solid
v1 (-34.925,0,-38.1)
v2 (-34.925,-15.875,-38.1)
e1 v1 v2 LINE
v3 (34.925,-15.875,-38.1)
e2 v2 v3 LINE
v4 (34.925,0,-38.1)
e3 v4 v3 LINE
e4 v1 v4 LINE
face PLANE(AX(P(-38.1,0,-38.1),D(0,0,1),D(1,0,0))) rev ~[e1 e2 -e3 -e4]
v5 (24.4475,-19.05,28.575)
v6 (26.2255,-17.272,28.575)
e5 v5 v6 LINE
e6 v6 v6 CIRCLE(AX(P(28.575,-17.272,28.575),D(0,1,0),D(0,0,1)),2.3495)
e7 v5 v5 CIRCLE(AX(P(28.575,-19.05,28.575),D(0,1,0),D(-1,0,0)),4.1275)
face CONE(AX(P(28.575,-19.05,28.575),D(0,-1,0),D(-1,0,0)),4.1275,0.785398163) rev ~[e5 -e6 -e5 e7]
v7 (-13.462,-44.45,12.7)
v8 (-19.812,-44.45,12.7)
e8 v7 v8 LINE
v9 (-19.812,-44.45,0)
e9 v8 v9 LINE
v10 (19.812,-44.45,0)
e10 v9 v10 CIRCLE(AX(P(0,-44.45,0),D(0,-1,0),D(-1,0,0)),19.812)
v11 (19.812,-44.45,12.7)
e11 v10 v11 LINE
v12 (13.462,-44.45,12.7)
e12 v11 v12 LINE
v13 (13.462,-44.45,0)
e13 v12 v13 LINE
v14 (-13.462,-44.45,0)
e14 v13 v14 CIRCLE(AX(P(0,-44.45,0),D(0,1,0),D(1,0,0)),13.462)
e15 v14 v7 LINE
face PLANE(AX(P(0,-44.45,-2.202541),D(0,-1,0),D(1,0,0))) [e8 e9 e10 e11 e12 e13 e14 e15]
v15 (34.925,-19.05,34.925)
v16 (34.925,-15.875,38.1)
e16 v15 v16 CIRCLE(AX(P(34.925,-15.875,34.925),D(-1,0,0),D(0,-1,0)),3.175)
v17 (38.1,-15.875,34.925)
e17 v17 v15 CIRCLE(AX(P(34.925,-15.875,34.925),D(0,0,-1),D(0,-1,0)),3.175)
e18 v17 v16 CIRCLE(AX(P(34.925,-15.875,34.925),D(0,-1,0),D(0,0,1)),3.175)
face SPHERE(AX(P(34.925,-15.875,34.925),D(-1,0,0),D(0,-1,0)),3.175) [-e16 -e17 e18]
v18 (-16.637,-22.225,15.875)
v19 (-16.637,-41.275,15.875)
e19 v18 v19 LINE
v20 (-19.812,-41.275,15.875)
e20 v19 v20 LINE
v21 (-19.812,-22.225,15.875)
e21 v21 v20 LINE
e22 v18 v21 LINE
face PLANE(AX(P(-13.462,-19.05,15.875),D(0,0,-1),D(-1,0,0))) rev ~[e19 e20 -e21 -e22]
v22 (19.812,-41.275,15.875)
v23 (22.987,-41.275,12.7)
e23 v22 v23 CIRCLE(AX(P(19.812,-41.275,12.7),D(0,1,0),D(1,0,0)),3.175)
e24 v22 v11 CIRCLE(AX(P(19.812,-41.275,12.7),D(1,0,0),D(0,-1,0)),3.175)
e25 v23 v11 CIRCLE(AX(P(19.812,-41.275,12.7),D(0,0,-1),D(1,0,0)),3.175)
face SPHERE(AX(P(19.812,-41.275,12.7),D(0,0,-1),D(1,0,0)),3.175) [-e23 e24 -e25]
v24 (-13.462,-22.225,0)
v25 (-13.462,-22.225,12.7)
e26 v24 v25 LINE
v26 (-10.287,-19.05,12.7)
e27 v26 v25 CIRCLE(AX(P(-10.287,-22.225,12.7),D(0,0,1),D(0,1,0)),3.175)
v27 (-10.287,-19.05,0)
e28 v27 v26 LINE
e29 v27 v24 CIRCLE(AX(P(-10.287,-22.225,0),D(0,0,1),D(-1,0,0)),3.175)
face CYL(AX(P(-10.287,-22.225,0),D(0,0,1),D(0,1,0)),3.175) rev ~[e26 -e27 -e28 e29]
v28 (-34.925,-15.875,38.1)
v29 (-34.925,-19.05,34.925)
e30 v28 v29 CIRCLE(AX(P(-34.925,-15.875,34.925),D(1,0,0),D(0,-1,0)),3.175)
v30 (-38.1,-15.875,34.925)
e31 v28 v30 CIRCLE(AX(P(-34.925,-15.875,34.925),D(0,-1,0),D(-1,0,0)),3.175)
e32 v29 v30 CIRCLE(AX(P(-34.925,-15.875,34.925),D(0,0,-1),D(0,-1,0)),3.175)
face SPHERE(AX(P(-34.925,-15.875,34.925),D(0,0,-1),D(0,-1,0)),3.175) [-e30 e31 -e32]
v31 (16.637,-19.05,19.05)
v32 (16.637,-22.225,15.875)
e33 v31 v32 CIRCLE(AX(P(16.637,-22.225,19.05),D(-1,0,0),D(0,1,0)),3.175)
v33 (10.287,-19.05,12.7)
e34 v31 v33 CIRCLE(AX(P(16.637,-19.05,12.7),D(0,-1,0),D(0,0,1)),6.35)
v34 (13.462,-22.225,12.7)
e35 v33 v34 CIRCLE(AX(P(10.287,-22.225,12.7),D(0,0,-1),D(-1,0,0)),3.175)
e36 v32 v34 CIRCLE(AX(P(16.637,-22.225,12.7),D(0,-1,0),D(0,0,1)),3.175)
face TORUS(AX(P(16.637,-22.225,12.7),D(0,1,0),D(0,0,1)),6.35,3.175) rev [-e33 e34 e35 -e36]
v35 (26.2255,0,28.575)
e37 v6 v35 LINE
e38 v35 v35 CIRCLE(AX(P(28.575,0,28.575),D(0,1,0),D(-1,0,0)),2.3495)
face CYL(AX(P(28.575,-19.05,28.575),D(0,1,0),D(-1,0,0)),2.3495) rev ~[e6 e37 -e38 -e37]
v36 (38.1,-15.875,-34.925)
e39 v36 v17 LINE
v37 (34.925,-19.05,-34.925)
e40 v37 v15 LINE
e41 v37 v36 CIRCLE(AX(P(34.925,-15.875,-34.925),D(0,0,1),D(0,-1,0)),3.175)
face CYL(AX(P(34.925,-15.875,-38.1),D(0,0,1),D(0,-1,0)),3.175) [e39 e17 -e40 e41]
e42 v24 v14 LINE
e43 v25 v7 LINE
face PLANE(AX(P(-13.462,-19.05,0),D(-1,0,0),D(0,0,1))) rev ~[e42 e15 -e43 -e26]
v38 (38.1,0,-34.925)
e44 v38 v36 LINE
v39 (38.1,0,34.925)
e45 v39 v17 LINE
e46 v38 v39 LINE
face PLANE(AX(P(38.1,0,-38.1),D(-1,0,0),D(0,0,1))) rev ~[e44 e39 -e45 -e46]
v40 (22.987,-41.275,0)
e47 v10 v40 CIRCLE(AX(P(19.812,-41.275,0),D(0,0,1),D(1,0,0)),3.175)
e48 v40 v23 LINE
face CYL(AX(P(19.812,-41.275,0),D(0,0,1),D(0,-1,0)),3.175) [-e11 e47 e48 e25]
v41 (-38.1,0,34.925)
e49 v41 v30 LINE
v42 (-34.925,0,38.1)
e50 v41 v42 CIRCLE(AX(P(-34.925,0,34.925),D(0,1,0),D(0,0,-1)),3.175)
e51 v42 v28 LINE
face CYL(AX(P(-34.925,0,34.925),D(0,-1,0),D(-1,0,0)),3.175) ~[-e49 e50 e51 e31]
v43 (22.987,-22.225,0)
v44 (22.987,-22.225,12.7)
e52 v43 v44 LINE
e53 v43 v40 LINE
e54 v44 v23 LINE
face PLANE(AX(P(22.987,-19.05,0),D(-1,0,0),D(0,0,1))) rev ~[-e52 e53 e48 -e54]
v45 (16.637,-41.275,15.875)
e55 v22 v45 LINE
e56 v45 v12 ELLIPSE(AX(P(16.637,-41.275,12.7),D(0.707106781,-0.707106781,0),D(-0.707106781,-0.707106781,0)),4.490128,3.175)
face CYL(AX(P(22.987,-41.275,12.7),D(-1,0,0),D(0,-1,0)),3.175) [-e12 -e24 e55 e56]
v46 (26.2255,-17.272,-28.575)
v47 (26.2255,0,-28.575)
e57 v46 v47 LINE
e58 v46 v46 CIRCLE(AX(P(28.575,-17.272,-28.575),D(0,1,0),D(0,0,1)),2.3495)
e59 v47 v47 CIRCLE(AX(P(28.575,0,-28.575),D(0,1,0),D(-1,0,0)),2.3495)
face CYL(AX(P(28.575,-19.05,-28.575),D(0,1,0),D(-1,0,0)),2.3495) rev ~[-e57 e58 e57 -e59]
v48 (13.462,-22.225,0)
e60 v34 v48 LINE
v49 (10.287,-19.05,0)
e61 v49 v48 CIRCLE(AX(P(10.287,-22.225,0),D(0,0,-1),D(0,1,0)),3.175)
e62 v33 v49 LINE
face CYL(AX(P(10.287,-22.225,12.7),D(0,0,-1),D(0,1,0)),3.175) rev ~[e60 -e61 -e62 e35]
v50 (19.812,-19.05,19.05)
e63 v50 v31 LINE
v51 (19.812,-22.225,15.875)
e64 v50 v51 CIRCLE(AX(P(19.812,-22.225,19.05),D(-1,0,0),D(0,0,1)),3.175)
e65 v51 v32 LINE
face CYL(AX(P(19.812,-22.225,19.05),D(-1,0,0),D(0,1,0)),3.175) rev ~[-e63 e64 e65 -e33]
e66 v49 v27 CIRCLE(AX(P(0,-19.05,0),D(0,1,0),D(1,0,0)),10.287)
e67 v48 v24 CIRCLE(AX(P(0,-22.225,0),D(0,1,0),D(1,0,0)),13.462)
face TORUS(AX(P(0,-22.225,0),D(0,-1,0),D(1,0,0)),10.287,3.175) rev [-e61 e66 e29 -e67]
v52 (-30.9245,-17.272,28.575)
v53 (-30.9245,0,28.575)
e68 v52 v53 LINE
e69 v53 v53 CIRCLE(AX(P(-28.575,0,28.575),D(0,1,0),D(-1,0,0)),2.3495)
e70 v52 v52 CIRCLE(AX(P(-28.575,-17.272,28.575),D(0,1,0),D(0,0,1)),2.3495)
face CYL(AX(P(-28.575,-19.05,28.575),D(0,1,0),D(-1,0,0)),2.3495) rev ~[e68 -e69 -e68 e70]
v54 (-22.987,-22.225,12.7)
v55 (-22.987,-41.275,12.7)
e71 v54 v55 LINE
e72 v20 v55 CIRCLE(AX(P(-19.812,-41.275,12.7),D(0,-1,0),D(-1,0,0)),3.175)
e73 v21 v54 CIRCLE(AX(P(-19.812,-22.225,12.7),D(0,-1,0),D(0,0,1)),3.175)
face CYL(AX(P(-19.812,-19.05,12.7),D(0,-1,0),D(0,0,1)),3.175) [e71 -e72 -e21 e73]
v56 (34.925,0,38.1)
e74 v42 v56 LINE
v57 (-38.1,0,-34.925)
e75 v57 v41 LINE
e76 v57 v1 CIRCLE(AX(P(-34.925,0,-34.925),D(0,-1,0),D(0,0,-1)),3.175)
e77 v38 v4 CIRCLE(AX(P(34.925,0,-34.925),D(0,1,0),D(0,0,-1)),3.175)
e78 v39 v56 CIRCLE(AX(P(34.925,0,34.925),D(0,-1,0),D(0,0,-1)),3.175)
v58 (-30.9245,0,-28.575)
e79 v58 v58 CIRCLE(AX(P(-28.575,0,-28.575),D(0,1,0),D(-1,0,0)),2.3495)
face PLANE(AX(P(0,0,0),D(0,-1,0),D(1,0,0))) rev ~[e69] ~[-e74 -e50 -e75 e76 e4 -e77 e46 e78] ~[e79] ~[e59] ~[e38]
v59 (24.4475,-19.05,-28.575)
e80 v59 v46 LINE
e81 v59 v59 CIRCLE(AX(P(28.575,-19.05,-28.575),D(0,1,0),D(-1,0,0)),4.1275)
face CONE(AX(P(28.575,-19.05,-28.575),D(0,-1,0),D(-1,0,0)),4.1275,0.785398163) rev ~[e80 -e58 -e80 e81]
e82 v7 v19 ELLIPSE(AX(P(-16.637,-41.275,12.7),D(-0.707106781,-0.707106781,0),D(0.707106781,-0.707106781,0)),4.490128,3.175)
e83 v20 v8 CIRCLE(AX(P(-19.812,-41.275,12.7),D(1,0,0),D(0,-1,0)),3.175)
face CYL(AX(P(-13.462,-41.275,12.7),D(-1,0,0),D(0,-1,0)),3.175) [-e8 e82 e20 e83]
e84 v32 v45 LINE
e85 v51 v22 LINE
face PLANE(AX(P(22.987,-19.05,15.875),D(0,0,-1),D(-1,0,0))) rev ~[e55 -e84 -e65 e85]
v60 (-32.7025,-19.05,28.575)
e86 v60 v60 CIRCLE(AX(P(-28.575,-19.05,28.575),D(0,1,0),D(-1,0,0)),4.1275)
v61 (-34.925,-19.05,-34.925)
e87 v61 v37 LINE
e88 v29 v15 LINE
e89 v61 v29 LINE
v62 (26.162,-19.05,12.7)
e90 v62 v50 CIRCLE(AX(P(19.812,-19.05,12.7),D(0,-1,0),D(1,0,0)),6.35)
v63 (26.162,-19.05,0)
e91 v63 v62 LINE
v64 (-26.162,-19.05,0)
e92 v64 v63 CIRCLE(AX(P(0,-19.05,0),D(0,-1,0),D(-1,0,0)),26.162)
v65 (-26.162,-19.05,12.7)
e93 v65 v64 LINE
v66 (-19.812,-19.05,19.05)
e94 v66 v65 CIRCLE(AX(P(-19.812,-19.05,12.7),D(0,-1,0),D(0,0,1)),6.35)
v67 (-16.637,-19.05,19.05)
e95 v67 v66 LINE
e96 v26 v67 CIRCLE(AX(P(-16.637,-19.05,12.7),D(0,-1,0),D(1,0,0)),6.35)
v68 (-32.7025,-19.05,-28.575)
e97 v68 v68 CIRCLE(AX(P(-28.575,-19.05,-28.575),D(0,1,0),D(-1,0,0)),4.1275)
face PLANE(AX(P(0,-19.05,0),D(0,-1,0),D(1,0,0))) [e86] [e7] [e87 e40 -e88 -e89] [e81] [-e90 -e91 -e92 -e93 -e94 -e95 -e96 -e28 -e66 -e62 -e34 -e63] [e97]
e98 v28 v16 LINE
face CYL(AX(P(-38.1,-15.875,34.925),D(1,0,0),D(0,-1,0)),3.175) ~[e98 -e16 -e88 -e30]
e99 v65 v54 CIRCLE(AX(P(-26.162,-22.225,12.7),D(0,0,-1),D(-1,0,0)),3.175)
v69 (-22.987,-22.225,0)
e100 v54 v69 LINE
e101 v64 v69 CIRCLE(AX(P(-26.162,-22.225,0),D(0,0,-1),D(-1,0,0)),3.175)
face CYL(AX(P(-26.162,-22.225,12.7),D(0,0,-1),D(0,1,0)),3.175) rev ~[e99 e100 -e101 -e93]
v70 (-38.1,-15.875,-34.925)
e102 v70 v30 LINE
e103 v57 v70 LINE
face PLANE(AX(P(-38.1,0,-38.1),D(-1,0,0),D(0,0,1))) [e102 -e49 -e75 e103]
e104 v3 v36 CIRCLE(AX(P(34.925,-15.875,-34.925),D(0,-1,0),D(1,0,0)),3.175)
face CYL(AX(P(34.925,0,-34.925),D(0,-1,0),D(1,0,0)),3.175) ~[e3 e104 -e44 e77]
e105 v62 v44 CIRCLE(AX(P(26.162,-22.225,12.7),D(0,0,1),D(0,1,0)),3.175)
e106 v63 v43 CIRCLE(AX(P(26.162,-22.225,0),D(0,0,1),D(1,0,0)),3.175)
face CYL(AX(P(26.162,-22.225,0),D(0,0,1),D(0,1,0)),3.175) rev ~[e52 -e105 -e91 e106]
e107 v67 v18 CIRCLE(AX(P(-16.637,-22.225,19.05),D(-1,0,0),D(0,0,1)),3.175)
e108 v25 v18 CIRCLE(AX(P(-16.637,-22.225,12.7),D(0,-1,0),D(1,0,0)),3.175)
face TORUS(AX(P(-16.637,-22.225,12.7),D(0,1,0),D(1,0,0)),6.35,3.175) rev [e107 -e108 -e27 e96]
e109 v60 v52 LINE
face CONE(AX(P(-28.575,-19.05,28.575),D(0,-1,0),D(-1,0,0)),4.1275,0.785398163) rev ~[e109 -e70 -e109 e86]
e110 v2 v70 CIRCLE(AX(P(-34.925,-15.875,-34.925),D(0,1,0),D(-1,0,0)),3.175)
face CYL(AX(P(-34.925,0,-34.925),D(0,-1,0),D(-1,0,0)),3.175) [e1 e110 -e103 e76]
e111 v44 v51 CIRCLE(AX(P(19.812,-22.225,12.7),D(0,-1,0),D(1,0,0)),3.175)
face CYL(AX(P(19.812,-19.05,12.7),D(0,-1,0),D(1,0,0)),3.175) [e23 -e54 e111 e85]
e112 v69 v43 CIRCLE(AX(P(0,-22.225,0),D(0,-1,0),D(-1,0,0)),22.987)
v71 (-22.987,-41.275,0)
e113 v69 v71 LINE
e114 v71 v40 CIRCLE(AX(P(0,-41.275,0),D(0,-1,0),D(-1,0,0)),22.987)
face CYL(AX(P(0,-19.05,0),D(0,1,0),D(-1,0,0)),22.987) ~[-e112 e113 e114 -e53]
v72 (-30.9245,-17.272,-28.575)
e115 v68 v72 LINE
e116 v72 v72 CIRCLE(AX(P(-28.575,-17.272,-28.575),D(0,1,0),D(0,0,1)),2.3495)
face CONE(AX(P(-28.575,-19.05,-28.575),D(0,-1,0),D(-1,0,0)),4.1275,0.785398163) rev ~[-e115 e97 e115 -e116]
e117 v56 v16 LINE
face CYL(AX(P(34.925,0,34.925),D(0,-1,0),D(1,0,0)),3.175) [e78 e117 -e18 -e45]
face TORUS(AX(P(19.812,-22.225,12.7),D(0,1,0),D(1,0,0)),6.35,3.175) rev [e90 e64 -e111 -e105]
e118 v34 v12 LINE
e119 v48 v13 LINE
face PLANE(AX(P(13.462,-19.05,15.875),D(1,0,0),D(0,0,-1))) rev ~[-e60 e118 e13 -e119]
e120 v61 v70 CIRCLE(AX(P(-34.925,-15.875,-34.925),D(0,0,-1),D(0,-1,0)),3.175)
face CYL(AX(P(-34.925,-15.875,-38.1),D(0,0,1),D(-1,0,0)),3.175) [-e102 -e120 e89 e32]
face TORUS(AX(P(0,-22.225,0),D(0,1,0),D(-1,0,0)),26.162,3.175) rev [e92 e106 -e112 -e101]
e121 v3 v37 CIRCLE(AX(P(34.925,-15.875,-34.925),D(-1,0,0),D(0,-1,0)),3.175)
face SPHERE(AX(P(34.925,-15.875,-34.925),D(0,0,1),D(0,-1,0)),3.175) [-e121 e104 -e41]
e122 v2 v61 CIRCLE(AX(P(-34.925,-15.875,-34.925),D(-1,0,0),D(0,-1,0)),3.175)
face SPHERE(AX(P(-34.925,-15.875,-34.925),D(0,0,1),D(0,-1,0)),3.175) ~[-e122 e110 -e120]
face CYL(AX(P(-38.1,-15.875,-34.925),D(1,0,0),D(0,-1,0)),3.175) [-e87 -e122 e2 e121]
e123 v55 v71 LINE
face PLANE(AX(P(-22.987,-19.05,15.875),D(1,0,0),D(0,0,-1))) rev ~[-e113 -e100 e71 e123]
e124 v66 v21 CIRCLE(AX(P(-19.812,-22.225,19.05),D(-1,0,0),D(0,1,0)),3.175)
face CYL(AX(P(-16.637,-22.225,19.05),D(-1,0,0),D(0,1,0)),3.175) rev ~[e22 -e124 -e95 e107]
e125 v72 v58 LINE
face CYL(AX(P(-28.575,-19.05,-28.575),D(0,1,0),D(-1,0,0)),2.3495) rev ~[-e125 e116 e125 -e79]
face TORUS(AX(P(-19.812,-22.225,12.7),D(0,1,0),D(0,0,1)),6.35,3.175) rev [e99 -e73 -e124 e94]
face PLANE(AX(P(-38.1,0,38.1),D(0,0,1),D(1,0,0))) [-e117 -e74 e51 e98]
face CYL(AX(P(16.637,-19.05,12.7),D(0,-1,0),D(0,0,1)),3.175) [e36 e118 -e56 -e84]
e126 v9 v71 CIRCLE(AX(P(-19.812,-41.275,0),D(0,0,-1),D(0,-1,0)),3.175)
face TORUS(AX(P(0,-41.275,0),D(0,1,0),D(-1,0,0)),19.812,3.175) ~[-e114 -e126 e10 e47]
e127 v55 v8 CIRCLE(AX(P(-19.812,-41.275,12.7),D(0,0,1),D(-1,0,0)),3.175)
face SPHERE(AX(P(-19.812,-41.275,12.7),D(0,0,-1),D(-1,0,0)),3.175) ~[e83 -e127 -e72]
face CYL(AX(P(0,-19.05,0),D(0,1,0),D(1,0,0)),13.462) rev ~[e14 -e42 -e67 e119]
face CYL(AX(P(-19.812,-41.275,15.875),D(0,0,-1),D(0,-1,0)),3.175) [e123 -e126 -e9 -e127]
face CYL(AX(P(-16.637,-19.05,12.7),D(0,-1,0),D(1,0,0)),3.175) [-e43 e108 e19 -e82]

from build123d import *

# Parameters (mm, degrees)
F0_W           = 76.2
F0_H           = 76.2
F1_DEPTH       = 19.05
F3_DEPTH       = 25.4
F5_D           = 4.699
F5_CSINK_D     = 8.255
F5_CSINK_ANGLE = 90
F6_F1_R        = 3.175
F6_F2_R        = 3.175


with BuildPart() as f1:
    # F0 (on Front) → F1 (new body)
    with BuildSketch(Plane.XZ):
        Rectangle(F0_W, F0_H)
    extrude(amount=F1_DEPTH)

    # F2 (on face) → F3 (join)
    with BuildSketch(Plane.XZ.offset(19.05)):
        with BuildLine():
            ThreePointArc((13.462, 0), (0, -13.462), (-13.462, 0))
            Line((-13.462, 0), (-13.462, 15.875))
            Line((-13.462, 15.875), (-22.987, 15.875))
            Line((-22.987, 15.875), (-22.987, 0))
            ThreePointArc((-22.987, 0), (0, -22.987), (22.987, 0))
            Line((22.987, 0), (22.987, 15.875))
            Line((22.987, 15.875), (13.462, 15.875))
            Line((13.462, 15.875), (13.462, 0))
        make_face()
    extrude(amount=F3_DEPTH)

    # F5 (through all)
    with Locations(Plane.XZ.offset(19.05)):
        with Locations((-28.575, 28.575), (28.575, 28.575), (28.575, -28.575), (-28.575, -28.575)):
            CounterSinkHole(F5_D / 2, F5_CSINK_D / 2, counter_sink_angle=F5_CSINK_ANGLE)

    # F6: fillet of radius 3.175 on 23 edges, made by hand

    # F6_f1
    f6_f1_edges = [f1.edges().sort_by_distance(p)[0] for p in [
        (-38.1, -19.05, 0),
        (0, -19.05, 38.1),
        (38.1, -19.05, 0),
        (0, -19.05, -38.1),
        (0, -44.45, -22.987),
        (38.1, -9.525, -38.1),
        (38.1, -9.525, 38.1),
        (-38.1, -9.525, 38.1),
        (-38.1, -9.525, -38.1),
        (-13.462, -31.75, 15.875),
        (13.462, -31.75, 15.875),
        (22.987, -31.75, 15.875),
        (-22.987, -31.75, 15.875),
        (-18.2245, -44.45, 15.875),
        (18.2245, -44.45, 15.875),
        (22.987, -44.45, 7.9375),
        (-22.987, -44.45, 7.9375),
    ]]
    fillet(f6_f1_edges, radius=F6_F1_R)

    # F6_f2
    f6_f2_edges = [f1.edges().sort_by_distance(p)[0] for p in [
        (0, -19.05, -22.987),
        (0, -19.05, -13.462),
        (13.462, -19.05, 6.35),
        (-13.462, -19.05, 6.35),
        (22.987, -19.05, 6.35),
        (-22.987, -19.05, 6.35),
        (-22.0570640303, -19.05, 14.9450640303),
        (22.0570640303, -19.05, 14.9450640303),
        (-14.3919359697, -19.05, 14.9450640303),
        (14.3919359697, -19.05, 14.9450640303),
    ]]
    fillet(f6_f2_edges, radius=F6_F2_R)


solid = f1.part
